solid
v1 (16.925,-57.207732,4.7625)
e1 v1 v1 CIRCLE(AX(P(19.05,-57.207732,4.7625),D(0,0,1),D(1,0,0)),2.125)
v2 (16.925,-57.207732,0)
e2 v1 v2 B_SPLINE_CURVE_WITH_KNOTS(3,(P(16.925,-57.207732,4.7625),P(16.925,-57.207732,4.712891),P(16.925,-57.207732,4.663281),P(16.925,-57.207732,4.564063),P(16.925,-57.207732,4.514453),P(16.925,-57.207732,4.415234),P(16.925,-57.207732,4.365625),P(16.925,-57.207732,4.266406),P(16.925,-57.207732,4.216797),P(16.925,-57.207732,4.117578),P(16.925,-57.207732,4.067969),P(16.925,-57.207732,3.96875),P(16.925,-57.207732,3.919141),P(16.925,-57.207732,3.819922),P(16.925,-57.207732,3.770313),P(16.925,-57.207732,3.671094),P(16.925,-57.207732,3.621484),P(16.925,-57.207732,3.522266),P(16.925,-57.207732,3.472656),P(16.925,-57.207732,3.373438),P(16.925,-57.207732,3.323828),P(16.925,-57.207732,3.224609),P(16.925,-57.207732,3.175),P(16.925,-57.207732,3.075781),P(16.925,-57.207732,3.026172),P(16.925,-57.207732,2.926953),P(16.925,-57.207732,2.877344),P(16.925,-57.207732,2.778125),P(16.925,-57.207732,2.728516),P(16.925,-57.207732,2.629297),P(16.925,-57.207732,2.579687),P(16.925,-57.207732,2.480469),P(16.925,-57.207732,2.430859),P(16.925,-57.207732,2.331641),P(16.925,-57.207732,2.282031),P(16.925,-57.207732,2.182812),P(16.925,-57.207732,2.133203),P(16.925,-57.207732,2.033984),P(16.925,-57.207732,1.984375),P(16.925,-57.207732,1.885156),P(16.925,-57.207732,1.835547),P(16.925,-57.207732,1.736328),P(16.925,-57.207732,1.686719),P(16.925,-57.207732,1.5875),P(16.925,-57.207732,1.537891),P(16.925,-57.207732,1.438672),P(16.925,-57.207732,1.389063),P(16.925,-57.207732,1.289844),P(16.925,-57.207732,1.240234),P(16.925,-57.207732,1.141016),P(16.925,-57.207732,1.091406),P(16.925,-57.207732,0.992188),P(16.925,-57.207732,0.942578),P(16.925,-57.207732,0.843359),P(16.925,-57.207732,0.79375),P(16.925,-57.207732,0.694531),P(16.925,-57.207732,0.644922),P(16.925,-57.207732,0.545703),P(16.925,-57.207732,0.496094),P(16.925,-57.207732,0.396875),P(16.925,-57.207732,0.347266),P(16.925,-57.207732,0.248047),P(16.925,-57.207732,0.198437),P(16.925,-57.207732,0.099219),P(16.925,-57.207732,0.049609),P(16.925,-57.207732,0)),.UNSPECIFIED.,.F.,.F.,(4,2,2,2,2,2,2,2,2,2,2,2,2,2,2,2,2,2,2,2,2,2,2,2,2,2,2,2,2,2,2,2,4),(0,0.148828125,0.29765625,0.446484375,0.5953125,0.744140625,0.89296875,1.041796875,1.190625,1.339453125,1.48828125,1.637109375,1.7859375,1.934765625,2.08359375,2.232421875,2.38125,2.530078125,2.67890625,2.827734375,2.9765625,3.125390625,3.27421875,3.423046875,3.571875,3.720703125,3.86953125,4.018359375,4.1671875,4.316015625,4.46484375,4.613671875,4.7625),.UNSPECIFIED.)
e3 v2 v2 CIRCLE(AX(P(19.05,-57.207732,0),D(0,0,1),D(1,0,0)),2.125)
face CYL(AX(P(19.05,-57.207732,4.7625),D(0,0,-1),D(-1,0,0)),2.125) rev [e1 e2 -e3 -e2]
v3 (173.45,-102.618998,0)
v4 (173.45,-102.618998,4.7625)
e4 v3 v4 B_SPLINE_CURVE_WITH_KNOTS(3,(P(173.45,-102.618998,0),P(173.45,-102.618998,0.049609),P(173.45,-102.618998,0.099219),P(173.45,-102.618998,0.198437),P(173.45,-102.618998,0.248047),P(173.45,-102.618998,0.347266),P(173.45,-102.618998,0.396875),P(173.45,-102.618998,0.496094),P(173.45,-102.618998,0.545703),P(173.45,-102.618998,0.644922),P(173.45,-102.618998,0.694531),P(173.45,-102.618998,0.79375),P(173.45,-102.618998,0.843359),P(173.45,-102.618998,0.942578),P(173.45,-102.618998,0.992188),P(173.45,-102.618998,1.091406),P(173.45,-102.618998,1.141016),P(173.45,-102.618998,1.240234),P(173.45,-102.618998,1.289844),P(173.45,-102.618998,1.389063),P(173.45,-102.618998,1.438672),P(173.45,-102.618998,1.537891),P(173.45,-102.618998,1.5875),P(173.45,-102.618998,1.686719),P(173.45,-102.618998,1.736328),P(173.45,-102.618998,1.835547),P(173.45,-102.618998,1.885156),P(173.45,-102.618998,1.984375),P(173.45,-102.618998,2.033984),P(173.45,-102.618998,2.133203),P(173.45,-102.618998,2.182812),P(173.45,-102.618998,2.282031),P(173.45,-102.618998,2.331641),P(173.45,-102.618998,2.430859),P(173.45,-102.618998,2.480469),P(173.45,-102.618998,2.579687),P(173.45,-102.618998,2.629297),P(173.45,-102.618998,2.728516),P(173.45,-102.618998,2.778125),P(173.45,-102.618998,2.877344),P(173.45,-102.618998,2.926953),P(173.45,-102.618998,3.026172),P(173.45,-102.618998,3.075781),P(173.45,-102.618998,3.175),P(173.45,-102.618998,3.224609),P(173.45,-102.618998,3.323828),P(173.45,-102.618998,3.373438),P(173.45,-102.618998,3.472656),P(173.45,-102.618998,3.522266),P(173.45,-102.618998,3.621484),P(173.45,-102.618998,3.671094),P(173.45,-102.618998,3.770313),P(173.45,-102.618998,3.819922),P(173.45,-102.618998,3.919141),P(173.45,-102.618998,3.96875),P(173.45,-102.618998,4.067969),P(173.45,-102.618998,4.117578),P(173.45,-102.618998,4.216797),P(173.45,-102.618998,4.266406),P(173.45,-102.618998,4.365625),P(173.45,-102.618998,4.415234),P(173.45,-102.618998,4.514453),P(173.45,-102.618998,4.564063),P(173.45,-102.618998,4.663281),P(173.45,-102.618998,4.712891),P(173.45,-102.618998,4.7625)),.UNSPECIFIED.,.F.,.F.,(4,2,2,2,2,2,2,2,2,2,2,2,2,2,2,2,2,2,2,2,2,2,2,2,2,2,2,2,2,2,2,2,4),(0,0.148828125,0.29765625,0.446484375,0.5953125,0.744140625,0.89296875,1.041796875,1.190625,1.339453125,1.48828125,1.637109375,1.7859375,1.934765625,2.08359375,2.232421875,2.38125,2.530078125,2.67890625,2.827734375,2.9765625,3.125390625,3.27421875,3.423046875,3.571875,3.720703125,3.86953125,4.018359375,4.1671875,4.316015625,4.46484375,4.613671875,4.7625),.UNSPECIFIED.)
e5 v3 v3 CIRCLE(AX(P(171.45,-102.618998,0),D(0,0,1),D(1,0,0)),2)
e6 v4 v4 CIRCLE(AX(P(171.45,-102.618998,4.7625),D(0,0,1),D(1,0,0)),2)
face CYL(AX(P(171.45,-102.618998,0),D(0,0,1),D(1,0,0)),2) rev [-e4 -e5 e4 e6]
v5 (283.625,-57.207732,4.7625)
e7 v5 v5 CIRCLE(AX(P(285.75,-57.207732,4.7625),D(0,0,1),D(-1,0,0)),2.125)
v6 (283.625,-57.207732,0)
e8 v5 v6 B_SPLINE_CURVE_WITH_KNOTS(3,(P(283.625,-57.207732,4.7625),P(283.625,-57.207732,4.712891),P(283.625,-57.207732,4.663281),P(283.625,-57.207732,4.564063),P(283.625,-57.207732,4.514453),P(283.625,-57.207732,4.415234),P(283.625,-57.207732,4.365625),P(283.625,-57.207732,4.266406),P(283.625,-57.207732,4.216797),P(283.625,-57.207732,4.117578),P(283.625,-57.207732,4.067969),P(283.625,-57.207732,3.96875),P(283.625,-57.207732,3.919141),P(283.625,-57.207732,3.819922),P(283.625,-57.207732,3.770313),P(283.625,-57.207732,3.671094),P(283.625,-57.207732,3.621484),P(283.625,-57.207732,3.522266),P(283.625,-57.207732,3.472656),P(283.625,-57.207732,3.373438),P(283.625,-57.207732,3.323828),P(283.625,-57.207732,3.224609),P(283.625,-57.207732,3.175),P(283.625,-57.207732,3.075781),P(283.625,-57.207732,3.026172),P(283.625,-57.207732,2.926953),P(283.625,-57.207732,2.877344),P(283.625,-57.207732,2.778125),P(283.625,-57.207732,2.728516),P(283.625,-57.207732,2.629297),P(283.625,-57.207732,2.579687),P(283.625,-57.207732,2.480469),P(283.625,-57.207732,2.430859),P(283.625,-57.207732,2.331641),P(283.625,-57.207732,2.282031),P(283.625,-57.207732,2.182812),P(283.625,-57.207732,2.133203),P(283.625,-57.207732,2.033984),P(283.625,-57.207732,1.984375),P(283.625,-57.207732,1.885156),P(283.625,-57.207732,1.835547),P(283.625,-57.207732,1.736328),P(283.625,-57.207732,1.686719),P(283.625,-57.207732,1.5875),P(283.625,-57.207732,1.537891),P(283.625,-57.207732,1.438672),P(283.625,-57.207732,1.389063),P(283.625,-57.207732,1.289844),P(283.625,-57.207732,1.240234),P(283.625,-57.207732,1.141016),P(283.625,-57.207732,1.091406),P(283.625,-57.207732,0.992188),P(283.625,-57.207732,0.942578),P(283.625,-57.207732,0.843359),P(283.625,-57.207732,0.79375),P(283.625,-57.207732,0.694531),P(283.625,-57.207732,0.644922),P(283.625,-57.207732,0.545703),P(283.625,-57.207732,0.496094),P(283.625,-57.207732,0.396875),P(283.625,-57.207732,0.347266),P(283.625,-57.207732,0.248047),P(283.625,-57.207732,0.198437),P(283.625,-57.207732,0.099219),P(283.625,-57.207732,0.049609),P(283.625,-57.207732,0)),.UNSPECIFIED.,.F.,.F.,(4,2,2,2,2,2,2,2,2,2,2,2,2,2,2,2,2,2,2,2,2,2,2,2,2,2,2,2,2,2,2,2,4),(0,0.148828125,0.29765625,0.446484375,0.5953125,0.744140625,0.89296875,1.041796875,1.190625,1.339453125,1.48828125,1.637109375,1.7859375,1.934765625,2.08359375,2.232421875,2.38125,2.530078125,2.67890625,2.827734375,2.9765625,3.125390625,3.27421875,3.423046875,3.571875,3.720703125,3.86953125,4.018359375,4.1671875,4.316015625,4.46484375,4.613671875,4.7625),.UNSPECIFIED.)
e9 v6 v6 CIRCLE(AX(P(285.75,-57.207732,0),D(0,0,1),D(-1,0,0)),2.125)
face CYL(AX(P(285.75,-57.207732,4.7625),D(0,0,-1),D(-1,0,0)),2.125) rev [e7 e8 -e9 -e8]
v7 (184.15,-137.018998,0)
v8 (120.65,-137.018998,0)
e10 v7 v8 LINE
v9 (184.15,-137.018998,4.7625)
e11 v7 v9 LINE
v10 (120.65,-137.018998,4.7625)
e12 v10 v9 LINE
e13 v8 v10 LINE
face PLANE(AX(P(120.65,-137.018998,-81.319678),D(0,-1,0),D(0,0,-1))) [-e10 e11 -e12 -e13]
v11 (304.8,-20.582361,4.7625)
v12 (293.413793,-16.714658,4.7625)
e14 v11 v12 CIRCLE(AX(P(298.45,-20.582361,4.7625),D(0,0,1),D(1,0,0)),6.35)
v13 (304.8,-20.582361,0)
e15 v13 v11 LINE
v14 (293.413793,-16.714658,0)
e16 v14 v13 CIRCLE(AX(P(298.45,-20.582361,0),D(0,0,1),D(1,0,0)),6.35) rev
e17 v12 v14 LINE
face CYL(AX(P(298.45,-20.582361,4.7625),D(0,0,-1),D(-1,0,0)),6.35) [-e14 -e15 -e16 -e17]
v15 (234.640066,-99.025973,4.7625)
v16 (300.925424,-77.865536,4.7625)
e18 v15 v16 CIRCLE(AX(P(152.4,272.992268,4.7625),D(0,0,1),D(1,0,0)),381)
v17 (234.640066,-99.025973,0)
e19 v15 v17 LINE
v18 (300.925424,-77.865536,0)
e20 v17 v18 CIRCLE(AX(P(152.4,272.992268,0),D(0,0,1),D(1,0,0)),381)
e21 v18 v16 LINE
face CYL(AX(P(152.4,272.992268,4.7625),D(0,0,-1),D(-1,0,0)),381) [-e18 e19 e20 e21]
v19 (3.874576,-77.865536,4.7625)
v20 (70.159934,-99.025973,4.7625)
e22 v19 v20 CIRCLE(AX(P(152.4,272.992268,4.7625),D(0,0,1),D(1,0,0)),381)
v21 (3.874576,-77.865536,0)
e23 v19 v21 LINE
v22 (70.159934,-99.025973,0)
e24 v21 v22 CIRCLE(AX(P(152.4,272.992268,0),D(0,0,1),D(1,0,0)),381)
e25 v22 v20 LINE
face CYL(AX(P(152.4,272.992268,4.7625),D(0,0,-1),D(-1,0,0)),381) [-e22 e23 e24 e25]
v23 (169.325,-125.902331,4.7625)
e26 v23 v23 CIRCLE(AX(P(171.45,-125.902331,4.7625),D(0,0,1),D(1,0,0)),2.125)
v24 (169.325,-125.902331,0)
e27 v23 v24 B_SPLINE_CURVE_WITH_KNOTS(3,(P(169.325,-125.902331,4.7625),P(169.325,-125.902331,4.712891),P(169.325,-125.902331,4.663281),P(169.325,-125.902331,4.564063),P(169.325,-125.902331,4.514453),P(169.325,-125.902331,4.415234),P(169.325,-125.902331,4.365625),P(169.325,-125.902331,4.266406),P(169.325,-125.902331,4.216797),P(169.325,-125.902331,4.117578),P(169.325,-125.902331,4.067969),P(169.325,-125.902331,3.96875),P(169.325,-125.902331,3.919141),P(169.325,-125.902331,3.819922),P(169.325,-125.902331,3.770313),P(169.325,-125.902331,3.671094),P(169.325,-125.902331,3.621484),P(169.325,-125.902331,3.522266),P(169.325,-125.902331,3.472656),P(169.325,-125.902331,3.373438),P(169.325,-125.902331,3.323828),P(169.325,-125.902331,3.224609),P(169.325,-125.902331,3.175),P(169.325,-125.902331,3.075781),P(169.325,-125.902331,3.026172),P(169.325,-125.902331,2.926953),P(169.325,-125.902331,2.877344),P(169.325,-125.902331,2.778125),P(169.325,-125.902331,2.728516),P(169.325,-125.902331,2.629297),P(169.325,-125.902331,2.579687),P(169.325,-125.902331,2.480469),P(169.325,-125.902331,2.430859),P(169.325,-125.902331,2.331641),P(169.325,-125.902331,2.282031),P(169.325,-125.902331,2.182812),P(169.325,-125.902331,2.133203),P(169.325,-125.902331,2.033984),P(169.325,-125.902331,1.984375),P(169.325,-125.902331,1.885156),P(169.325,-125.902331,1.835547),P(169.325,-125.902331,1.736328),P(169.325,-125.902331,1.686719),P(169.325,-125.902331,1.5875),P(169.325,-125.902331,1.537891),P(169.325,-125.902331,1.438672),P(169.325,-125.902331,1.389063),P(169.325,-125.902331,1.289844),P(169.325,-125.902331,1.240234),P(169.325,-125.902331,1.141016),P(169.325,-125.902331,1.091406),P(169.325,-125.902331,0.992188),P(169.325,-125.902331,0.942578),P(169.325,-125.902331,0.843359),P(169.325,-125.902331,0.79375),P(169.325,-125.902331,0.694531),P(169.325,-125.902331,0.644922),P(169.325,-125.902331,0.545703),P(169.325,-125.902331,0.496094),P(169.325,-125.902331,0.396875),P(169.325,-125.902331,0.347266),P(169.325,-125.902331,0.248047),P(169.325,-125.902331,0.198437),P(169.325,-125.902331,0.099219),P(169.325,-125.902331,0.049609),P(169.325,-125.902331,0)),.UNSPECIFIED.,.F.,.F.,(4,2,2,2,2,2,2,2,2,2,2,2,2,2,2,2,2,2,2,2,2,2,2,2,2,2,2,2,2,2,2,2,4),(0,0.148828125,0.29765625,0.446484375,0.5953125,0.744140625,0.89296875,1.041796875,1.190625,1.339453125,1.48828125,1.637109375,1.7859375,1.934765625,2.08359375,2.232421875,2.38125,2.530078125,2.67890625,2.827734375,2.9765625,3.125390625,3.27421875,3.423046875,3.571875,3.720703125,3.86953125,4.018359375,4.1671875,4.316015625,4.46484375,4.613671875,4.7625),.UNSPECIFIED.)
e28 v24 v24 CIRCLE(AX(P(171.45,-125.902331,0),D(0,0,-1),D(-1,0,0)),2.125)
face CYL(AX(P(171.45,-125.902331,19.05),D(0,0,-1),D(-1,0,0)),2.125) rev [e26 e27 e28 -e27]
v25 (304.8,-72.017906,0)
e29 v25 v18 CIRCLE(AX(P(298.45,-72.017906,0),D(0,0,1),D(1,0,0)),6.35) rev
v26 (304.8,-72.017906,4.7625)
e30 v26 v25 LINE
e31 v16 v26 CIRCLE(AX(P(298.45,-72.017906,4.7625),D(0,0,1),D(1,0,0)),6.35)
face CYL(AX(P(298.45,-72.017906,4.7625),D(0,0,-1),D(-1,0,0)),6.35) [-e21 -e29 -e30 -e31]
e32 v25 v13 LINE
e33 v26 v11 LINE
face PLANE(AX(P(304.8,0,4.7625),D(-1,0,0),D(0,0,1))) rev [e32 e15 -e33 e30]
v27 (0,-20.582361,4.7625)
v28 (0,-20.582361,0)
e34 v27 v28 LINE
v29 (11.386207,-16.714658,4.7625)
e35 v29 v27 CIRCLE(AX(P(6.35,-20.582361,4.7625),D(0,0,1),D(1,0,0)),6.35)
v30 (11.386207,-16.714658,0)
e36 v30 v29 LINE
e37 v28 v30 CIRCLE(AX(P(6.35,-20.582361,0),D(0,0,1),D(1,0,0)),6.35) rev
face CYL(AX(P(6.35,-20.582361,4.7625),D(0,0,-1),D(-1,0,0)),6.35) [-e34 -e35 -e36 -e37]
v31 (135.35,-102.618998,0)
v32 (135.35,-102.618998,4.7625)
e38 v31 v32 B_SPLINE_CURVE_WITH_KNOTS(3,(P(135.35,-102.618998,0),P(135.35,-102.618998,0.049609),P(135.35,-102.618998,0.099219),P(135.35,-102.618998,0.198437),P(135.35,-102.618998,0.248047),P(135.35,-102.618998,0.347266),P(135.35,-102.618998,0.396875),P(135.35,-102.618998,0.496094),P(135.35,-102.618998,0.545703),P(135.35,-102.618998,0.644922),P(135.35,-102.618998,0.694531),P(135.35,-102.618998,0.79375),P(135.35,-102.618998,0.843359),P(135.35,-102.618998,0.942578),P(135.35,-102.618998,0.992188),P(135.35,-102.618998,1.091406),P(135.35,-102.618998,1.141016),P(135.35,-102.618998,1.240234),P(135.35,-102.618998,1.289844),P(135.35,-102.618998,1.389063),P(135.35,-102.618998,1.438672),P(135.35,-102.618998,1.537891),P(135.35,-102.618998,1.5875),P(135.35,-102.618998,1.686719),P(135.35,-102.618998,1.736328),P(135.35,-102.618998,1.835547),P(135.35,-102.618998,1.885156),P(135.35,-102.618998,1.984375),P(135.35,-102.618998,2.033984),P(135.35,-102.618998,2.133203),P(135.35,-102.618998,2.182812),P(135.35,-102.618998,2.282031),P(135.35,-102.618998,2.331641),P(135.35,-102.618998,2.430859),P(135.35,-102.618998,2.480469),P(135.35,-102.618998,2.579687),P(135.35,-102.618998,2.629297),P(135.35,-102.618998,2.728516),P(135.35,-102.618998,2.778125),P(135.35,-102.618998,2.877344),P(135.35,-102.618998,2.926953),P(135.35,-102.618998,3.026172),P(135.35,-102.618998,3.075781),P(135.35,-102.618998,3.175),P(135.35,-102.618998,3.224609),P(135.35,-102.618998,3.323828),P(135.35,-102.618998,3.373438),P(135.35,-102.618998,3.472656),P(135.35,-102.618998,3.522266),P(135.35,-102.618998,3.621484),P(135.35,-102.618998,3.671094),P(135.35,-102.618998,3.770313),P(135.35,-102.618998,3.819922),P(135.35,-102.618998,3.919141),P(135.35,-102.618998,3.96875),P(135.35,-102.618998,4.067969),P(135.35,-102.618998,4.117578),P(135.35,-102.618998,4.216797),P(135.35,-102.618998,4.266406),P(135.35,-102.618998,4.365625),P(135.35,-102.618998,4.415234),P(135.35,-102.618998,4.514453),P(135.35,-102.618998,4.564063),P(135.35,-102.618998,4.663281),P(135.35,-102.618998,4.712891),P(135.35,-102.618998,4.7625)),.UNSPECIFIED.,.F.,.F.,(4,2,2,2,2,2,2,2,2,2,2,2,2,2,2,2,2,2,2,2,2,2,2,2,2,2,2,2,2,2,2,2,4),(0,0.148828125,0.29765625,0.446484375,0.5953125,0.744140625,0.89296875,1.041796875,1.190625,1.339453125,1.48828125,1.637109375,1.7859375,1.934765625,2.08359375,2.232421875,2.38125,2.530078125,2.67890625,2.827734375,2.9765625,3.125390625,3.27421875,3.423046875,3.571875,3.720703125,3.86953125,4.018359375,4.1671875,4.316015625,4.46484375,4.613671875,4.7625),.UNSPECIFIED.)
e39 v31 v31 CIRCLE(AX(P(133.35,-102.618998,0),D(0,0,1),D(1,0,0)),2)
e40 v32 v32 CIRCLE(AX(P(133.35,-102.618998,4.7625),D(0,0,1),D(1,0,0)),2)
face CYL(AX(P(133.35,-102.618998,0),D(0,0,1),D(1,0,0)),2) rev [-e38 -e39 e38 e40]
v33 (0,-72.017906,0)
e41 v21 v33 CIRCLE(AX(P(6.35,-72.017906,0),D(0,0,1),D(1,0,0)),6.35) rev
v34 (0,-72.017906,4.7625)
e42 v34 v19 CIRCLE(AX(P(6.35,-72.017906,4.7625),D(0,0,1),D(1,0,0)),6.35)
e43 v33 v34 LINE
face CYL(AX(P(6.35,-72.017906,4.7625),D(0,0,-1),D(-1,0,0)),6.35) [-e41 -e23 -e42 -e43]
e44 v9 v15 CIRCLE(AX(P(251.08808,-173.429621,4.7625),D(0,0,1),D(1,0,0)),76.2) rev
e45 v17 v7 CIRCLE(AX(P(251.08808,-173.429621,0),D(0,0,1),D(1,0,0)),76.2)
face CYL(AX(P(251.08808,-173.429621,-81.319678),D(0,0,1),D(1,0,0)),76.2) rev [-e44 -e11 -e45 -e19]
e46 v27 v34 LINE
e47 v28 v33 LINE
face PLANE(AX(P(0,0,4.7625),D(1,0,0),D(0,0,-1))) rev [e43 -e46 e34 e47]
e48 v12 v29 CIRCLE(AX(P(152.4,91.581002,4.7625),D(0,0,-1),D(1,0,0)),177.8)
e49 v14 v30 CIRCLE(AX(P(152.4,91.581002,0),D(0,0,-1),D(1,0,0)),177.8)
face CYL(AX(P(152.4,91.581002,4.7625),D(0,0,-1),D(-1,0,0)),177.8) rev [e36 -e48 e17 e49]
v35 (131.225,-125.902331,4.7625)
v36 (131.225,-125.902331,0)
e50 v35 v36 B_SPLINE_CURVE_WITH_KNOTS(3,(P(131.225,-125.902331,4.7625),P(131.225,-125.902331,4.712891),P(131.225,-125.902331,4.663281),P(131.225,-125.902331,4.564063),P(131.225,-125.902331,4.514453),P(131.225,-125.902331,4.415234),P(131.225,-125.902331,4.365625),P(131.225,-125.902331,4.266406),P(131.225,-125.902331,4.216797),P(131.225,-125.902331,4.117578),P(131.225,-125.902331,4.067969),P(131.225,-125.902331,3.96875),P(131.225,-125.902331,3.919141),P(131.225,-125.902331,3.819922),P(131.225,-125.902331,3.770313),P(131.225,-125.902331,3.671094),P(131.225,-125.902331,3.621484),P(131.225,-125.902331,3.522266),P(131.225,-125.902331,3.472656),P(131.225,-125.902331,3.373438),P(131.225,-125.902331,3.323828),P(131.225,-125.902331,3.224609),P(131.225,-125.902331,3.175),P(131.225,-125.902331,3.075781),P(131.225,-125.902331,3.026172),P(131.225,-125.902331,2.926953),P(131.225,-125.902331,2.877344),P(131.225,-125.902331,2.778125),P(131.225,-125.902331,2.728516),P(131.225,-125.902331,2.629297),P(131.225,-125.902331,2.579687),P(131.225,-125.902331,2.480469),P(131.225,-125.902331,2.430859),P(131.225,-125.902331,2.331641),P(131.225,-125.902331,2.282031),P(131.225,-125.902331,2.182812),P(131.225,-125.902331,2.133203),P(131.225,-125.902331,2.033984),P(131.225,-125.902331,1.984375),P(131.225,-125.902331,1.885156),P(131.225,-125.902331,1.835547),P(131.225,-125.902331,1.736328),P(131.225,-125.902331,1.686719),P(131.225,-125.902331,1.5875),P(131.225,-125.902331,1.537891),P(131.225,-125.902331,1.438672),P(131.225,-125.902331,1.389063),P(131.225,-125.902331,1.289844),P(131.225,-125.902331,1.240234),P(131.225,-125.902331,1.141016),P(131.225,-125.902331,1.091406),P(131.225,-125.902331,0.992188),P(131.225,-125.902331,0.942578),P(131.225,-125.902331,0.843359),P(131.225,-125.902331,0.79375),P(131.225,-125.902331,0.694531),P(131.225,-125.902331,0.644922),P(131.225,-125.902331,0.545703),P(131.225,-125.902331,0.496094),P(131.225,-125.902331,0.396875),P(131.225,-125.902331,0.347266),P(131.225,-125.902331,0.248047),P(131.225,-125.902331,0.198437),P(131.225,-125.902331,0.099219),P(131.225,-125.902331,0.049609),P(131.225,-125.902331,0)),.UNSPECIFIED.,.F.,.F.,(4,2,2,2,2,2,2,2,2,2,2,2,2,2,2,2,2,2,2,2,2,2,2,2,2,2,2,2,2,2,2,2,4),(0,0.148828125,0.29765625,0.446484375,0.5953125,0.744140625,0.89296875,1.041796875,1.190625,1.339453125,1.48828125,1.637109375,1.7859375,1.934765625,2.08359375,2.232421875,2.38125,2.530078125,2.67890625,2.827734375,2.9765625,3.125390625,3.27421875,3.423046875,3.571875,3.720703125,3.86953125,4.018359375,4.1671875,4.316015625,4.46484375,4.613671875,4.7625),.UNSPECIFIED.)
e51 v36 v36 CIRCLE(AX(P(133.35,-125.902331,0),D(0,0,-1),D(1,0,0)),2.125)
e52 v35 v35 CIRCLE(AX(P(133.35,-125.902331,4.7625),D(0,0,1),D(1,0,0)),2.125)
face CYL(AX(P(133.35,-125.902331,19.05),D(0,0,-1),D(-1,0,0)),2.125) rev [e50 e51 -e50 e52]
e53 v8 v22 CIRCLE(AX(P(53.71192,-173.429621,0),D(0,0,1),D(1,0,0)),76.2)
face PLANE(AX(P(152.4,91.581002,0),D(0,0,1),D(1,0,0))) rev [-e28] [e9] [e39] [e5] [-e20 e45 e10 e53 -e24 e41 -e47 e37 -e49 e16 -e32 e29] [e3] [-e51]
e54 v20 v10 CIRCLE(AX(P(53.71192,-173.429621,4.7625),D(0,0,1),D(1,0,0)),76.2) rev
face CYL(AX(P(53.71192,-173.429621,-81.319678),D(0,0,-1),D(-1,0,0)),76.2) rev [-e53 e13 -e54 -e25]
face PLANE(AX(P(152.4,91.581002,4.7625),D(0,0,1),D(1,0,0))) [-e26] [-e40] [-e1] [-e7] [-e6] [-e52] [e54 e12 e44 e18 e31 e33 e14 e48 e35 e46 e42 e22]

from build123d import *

# Parameters (mm, degrees)
SKETCH1_R           = 2.125
BOSS_EXTRUDE1_DEPTH = 4.7625
FILLET1_R           = 6.35
FILLET2_R           = 6.35
SKETCH3_W           = 63.5
SKETCH3_H           = 50.8
BOSS_EXTRUDE2_DEPTH = 4.7625
FILLET3_R           = 76.2
SKETCH8_R           = 2.125
CUT_EXTRUDE3_DEPTH  = 19.05
SKETCH10_R          = 2
CUT_EXTRUDE7_DEPTH  = 335.215390296


with BuildPart() as part:
    # Sketch1 → Boss-Extrude1 (new body)
    with BuildSketch(Plane.XY):
        with BuildLine():
            Line((0, 0), (0, -76.2))
            ThreePointArc((0, -76.2), (152.4, -108.007732044), (304.8, -76.2))
            Line((304.8, -76.2), (304.8, 0))
            ThreePointArc((304.8, 0), (152.4, -86.218997603), (0, 0))
        make_face()
        with Locations(Location((19.05, -57.207732044, 0), (0, 0, 180))):
            Circle(SKETCH1_R, mode=Mode.SUBTRACT)
        with Locations(Location((285.75, -57.207732044, 0), (0, 0, 180))):
            Circle(SKETCH1_R, mode=Mode.SUBTRACT)
    extrude(amount=BOSS_EXTRUDE1_DEPTH)

    # Fillet1
    fillet1_edges = [part.edges().sort_by_distance(p)[0] for p in [
        (304.8, 0, 2.38125),
        (0, 0, 2.38125),
    ]]
    fillet(fillet1_edges, radius=FILLET1_R)

    # Fillet2
    fillet2_edges = [part.edges().sort_by_distance(p)[0] for p in [
        (304.8, -76.2, 2.38125),
        (0, -76.2, 2.38125),
    ]]
    fillet(fillet2_edges, radius=FILLET2_R)

    # Sketch3 → Boss-Extrude2 (add)
    with BuildSketch(Plane.XY.offset(4.7625)):
        with Locations((152.4, -111.618997603)):
            Rectangle(SKETCH3_W, SKETCH3_H)
    extrude(amount=-BOSS_EXTRUDE2_DEPTH)

    # Fillet3
    # the kernel refuses this fillet: 76.2 mm, written as the material it adds along each edge
    with BuildSketch(Plane(origin=(184.15, -106.682510638, 4.7625), x_dir=(0.9886965633546299, 0.14993033585883936, 0), z_dir=(0, 0, -1))) as fillet3_piece_1:
        with BuildLine():
            CenterArc((56.174032607, 76.02868739), FILLET3_R, 217.166641645, 48.990660759)
            Line((-4.548359679, 29.993580407), (-5.762807525, 29.072878267))
            ThreePointArc((-5.762807525, 29.072878267), (-3.780953402, 14.768296372), (-1.506773563, -0.228493832))
            Line((-1.506773563, -0.228493832), (0.102134605, -1.520573748))
            ThreePointArc((0.102134605, -1.520573748), (25.533651185, -0.667436951), (50.965167766, -1.520573748))
            Line((50.965167766, -1.520573748), (51.06730237, 0))
        make_face()
    extrude(amount=4.7625)
    with BuildSketch(Plane(origin=(120.65, -106.682510638, 4.7625), x_dir=(0, -1, 0), z_dir=(0, 0, -1))) as fillet3_piece_2:
        with BuildLine():
            CenterArc((66.747110364, 66.938079624), FILLET3_R, 192.465587038, 48.990660759)
            Line((-7.656537796, 50.490066353), (-9.144610759, 50.161106088))
            ThreePointArc((-9.144610759, 50.161106088), (-4.488161518, 25.14496413), (-1.518699114, -0.127))
            Line((-1.518699114, -0.127), (0, -1.524))
            ThreePointArc((0, -1.524), (15.168243483, -1.524), (29.608274497, -1.338761592))
            Line((29.608274497, -1.338761592), (30.336486965, 0))
        make_face()
    extrude(amount=4.7625)

    # Sketch8 → Cut-Extrude3 (cut)
    with BuildSketch(Plane(origin=(0, 0, 0), x_dir=(-1, 0, 0), z_dir=(0, 0, -1))):
        with Locations((-171.45, -125.902330937)):
            Circle(SKETCH8_R)
        with Locations((-133.35, -125.902330937)):
            Circle(SKETCH8_R)
    extrude(amount=-CUT_EXTRUDE3_DEPTH, mode=Mode.SUBTRACT)

    # Sketch10 → Cut-Extrude7 (cut, through all)
    with BuildSketch(Plane.XY.offset(4.7625)):
        with Locations((133.35, -102.618997603)):
            Circle(SKETCH10_R)
        with Locations((171.45, -102.618997603)):
            Circle(SKETCH10_R)
    extrude(amount=-CUT_EXTRUDE7_DEPTH, mode=Mode.SUBTRACT)


solid = part.part
